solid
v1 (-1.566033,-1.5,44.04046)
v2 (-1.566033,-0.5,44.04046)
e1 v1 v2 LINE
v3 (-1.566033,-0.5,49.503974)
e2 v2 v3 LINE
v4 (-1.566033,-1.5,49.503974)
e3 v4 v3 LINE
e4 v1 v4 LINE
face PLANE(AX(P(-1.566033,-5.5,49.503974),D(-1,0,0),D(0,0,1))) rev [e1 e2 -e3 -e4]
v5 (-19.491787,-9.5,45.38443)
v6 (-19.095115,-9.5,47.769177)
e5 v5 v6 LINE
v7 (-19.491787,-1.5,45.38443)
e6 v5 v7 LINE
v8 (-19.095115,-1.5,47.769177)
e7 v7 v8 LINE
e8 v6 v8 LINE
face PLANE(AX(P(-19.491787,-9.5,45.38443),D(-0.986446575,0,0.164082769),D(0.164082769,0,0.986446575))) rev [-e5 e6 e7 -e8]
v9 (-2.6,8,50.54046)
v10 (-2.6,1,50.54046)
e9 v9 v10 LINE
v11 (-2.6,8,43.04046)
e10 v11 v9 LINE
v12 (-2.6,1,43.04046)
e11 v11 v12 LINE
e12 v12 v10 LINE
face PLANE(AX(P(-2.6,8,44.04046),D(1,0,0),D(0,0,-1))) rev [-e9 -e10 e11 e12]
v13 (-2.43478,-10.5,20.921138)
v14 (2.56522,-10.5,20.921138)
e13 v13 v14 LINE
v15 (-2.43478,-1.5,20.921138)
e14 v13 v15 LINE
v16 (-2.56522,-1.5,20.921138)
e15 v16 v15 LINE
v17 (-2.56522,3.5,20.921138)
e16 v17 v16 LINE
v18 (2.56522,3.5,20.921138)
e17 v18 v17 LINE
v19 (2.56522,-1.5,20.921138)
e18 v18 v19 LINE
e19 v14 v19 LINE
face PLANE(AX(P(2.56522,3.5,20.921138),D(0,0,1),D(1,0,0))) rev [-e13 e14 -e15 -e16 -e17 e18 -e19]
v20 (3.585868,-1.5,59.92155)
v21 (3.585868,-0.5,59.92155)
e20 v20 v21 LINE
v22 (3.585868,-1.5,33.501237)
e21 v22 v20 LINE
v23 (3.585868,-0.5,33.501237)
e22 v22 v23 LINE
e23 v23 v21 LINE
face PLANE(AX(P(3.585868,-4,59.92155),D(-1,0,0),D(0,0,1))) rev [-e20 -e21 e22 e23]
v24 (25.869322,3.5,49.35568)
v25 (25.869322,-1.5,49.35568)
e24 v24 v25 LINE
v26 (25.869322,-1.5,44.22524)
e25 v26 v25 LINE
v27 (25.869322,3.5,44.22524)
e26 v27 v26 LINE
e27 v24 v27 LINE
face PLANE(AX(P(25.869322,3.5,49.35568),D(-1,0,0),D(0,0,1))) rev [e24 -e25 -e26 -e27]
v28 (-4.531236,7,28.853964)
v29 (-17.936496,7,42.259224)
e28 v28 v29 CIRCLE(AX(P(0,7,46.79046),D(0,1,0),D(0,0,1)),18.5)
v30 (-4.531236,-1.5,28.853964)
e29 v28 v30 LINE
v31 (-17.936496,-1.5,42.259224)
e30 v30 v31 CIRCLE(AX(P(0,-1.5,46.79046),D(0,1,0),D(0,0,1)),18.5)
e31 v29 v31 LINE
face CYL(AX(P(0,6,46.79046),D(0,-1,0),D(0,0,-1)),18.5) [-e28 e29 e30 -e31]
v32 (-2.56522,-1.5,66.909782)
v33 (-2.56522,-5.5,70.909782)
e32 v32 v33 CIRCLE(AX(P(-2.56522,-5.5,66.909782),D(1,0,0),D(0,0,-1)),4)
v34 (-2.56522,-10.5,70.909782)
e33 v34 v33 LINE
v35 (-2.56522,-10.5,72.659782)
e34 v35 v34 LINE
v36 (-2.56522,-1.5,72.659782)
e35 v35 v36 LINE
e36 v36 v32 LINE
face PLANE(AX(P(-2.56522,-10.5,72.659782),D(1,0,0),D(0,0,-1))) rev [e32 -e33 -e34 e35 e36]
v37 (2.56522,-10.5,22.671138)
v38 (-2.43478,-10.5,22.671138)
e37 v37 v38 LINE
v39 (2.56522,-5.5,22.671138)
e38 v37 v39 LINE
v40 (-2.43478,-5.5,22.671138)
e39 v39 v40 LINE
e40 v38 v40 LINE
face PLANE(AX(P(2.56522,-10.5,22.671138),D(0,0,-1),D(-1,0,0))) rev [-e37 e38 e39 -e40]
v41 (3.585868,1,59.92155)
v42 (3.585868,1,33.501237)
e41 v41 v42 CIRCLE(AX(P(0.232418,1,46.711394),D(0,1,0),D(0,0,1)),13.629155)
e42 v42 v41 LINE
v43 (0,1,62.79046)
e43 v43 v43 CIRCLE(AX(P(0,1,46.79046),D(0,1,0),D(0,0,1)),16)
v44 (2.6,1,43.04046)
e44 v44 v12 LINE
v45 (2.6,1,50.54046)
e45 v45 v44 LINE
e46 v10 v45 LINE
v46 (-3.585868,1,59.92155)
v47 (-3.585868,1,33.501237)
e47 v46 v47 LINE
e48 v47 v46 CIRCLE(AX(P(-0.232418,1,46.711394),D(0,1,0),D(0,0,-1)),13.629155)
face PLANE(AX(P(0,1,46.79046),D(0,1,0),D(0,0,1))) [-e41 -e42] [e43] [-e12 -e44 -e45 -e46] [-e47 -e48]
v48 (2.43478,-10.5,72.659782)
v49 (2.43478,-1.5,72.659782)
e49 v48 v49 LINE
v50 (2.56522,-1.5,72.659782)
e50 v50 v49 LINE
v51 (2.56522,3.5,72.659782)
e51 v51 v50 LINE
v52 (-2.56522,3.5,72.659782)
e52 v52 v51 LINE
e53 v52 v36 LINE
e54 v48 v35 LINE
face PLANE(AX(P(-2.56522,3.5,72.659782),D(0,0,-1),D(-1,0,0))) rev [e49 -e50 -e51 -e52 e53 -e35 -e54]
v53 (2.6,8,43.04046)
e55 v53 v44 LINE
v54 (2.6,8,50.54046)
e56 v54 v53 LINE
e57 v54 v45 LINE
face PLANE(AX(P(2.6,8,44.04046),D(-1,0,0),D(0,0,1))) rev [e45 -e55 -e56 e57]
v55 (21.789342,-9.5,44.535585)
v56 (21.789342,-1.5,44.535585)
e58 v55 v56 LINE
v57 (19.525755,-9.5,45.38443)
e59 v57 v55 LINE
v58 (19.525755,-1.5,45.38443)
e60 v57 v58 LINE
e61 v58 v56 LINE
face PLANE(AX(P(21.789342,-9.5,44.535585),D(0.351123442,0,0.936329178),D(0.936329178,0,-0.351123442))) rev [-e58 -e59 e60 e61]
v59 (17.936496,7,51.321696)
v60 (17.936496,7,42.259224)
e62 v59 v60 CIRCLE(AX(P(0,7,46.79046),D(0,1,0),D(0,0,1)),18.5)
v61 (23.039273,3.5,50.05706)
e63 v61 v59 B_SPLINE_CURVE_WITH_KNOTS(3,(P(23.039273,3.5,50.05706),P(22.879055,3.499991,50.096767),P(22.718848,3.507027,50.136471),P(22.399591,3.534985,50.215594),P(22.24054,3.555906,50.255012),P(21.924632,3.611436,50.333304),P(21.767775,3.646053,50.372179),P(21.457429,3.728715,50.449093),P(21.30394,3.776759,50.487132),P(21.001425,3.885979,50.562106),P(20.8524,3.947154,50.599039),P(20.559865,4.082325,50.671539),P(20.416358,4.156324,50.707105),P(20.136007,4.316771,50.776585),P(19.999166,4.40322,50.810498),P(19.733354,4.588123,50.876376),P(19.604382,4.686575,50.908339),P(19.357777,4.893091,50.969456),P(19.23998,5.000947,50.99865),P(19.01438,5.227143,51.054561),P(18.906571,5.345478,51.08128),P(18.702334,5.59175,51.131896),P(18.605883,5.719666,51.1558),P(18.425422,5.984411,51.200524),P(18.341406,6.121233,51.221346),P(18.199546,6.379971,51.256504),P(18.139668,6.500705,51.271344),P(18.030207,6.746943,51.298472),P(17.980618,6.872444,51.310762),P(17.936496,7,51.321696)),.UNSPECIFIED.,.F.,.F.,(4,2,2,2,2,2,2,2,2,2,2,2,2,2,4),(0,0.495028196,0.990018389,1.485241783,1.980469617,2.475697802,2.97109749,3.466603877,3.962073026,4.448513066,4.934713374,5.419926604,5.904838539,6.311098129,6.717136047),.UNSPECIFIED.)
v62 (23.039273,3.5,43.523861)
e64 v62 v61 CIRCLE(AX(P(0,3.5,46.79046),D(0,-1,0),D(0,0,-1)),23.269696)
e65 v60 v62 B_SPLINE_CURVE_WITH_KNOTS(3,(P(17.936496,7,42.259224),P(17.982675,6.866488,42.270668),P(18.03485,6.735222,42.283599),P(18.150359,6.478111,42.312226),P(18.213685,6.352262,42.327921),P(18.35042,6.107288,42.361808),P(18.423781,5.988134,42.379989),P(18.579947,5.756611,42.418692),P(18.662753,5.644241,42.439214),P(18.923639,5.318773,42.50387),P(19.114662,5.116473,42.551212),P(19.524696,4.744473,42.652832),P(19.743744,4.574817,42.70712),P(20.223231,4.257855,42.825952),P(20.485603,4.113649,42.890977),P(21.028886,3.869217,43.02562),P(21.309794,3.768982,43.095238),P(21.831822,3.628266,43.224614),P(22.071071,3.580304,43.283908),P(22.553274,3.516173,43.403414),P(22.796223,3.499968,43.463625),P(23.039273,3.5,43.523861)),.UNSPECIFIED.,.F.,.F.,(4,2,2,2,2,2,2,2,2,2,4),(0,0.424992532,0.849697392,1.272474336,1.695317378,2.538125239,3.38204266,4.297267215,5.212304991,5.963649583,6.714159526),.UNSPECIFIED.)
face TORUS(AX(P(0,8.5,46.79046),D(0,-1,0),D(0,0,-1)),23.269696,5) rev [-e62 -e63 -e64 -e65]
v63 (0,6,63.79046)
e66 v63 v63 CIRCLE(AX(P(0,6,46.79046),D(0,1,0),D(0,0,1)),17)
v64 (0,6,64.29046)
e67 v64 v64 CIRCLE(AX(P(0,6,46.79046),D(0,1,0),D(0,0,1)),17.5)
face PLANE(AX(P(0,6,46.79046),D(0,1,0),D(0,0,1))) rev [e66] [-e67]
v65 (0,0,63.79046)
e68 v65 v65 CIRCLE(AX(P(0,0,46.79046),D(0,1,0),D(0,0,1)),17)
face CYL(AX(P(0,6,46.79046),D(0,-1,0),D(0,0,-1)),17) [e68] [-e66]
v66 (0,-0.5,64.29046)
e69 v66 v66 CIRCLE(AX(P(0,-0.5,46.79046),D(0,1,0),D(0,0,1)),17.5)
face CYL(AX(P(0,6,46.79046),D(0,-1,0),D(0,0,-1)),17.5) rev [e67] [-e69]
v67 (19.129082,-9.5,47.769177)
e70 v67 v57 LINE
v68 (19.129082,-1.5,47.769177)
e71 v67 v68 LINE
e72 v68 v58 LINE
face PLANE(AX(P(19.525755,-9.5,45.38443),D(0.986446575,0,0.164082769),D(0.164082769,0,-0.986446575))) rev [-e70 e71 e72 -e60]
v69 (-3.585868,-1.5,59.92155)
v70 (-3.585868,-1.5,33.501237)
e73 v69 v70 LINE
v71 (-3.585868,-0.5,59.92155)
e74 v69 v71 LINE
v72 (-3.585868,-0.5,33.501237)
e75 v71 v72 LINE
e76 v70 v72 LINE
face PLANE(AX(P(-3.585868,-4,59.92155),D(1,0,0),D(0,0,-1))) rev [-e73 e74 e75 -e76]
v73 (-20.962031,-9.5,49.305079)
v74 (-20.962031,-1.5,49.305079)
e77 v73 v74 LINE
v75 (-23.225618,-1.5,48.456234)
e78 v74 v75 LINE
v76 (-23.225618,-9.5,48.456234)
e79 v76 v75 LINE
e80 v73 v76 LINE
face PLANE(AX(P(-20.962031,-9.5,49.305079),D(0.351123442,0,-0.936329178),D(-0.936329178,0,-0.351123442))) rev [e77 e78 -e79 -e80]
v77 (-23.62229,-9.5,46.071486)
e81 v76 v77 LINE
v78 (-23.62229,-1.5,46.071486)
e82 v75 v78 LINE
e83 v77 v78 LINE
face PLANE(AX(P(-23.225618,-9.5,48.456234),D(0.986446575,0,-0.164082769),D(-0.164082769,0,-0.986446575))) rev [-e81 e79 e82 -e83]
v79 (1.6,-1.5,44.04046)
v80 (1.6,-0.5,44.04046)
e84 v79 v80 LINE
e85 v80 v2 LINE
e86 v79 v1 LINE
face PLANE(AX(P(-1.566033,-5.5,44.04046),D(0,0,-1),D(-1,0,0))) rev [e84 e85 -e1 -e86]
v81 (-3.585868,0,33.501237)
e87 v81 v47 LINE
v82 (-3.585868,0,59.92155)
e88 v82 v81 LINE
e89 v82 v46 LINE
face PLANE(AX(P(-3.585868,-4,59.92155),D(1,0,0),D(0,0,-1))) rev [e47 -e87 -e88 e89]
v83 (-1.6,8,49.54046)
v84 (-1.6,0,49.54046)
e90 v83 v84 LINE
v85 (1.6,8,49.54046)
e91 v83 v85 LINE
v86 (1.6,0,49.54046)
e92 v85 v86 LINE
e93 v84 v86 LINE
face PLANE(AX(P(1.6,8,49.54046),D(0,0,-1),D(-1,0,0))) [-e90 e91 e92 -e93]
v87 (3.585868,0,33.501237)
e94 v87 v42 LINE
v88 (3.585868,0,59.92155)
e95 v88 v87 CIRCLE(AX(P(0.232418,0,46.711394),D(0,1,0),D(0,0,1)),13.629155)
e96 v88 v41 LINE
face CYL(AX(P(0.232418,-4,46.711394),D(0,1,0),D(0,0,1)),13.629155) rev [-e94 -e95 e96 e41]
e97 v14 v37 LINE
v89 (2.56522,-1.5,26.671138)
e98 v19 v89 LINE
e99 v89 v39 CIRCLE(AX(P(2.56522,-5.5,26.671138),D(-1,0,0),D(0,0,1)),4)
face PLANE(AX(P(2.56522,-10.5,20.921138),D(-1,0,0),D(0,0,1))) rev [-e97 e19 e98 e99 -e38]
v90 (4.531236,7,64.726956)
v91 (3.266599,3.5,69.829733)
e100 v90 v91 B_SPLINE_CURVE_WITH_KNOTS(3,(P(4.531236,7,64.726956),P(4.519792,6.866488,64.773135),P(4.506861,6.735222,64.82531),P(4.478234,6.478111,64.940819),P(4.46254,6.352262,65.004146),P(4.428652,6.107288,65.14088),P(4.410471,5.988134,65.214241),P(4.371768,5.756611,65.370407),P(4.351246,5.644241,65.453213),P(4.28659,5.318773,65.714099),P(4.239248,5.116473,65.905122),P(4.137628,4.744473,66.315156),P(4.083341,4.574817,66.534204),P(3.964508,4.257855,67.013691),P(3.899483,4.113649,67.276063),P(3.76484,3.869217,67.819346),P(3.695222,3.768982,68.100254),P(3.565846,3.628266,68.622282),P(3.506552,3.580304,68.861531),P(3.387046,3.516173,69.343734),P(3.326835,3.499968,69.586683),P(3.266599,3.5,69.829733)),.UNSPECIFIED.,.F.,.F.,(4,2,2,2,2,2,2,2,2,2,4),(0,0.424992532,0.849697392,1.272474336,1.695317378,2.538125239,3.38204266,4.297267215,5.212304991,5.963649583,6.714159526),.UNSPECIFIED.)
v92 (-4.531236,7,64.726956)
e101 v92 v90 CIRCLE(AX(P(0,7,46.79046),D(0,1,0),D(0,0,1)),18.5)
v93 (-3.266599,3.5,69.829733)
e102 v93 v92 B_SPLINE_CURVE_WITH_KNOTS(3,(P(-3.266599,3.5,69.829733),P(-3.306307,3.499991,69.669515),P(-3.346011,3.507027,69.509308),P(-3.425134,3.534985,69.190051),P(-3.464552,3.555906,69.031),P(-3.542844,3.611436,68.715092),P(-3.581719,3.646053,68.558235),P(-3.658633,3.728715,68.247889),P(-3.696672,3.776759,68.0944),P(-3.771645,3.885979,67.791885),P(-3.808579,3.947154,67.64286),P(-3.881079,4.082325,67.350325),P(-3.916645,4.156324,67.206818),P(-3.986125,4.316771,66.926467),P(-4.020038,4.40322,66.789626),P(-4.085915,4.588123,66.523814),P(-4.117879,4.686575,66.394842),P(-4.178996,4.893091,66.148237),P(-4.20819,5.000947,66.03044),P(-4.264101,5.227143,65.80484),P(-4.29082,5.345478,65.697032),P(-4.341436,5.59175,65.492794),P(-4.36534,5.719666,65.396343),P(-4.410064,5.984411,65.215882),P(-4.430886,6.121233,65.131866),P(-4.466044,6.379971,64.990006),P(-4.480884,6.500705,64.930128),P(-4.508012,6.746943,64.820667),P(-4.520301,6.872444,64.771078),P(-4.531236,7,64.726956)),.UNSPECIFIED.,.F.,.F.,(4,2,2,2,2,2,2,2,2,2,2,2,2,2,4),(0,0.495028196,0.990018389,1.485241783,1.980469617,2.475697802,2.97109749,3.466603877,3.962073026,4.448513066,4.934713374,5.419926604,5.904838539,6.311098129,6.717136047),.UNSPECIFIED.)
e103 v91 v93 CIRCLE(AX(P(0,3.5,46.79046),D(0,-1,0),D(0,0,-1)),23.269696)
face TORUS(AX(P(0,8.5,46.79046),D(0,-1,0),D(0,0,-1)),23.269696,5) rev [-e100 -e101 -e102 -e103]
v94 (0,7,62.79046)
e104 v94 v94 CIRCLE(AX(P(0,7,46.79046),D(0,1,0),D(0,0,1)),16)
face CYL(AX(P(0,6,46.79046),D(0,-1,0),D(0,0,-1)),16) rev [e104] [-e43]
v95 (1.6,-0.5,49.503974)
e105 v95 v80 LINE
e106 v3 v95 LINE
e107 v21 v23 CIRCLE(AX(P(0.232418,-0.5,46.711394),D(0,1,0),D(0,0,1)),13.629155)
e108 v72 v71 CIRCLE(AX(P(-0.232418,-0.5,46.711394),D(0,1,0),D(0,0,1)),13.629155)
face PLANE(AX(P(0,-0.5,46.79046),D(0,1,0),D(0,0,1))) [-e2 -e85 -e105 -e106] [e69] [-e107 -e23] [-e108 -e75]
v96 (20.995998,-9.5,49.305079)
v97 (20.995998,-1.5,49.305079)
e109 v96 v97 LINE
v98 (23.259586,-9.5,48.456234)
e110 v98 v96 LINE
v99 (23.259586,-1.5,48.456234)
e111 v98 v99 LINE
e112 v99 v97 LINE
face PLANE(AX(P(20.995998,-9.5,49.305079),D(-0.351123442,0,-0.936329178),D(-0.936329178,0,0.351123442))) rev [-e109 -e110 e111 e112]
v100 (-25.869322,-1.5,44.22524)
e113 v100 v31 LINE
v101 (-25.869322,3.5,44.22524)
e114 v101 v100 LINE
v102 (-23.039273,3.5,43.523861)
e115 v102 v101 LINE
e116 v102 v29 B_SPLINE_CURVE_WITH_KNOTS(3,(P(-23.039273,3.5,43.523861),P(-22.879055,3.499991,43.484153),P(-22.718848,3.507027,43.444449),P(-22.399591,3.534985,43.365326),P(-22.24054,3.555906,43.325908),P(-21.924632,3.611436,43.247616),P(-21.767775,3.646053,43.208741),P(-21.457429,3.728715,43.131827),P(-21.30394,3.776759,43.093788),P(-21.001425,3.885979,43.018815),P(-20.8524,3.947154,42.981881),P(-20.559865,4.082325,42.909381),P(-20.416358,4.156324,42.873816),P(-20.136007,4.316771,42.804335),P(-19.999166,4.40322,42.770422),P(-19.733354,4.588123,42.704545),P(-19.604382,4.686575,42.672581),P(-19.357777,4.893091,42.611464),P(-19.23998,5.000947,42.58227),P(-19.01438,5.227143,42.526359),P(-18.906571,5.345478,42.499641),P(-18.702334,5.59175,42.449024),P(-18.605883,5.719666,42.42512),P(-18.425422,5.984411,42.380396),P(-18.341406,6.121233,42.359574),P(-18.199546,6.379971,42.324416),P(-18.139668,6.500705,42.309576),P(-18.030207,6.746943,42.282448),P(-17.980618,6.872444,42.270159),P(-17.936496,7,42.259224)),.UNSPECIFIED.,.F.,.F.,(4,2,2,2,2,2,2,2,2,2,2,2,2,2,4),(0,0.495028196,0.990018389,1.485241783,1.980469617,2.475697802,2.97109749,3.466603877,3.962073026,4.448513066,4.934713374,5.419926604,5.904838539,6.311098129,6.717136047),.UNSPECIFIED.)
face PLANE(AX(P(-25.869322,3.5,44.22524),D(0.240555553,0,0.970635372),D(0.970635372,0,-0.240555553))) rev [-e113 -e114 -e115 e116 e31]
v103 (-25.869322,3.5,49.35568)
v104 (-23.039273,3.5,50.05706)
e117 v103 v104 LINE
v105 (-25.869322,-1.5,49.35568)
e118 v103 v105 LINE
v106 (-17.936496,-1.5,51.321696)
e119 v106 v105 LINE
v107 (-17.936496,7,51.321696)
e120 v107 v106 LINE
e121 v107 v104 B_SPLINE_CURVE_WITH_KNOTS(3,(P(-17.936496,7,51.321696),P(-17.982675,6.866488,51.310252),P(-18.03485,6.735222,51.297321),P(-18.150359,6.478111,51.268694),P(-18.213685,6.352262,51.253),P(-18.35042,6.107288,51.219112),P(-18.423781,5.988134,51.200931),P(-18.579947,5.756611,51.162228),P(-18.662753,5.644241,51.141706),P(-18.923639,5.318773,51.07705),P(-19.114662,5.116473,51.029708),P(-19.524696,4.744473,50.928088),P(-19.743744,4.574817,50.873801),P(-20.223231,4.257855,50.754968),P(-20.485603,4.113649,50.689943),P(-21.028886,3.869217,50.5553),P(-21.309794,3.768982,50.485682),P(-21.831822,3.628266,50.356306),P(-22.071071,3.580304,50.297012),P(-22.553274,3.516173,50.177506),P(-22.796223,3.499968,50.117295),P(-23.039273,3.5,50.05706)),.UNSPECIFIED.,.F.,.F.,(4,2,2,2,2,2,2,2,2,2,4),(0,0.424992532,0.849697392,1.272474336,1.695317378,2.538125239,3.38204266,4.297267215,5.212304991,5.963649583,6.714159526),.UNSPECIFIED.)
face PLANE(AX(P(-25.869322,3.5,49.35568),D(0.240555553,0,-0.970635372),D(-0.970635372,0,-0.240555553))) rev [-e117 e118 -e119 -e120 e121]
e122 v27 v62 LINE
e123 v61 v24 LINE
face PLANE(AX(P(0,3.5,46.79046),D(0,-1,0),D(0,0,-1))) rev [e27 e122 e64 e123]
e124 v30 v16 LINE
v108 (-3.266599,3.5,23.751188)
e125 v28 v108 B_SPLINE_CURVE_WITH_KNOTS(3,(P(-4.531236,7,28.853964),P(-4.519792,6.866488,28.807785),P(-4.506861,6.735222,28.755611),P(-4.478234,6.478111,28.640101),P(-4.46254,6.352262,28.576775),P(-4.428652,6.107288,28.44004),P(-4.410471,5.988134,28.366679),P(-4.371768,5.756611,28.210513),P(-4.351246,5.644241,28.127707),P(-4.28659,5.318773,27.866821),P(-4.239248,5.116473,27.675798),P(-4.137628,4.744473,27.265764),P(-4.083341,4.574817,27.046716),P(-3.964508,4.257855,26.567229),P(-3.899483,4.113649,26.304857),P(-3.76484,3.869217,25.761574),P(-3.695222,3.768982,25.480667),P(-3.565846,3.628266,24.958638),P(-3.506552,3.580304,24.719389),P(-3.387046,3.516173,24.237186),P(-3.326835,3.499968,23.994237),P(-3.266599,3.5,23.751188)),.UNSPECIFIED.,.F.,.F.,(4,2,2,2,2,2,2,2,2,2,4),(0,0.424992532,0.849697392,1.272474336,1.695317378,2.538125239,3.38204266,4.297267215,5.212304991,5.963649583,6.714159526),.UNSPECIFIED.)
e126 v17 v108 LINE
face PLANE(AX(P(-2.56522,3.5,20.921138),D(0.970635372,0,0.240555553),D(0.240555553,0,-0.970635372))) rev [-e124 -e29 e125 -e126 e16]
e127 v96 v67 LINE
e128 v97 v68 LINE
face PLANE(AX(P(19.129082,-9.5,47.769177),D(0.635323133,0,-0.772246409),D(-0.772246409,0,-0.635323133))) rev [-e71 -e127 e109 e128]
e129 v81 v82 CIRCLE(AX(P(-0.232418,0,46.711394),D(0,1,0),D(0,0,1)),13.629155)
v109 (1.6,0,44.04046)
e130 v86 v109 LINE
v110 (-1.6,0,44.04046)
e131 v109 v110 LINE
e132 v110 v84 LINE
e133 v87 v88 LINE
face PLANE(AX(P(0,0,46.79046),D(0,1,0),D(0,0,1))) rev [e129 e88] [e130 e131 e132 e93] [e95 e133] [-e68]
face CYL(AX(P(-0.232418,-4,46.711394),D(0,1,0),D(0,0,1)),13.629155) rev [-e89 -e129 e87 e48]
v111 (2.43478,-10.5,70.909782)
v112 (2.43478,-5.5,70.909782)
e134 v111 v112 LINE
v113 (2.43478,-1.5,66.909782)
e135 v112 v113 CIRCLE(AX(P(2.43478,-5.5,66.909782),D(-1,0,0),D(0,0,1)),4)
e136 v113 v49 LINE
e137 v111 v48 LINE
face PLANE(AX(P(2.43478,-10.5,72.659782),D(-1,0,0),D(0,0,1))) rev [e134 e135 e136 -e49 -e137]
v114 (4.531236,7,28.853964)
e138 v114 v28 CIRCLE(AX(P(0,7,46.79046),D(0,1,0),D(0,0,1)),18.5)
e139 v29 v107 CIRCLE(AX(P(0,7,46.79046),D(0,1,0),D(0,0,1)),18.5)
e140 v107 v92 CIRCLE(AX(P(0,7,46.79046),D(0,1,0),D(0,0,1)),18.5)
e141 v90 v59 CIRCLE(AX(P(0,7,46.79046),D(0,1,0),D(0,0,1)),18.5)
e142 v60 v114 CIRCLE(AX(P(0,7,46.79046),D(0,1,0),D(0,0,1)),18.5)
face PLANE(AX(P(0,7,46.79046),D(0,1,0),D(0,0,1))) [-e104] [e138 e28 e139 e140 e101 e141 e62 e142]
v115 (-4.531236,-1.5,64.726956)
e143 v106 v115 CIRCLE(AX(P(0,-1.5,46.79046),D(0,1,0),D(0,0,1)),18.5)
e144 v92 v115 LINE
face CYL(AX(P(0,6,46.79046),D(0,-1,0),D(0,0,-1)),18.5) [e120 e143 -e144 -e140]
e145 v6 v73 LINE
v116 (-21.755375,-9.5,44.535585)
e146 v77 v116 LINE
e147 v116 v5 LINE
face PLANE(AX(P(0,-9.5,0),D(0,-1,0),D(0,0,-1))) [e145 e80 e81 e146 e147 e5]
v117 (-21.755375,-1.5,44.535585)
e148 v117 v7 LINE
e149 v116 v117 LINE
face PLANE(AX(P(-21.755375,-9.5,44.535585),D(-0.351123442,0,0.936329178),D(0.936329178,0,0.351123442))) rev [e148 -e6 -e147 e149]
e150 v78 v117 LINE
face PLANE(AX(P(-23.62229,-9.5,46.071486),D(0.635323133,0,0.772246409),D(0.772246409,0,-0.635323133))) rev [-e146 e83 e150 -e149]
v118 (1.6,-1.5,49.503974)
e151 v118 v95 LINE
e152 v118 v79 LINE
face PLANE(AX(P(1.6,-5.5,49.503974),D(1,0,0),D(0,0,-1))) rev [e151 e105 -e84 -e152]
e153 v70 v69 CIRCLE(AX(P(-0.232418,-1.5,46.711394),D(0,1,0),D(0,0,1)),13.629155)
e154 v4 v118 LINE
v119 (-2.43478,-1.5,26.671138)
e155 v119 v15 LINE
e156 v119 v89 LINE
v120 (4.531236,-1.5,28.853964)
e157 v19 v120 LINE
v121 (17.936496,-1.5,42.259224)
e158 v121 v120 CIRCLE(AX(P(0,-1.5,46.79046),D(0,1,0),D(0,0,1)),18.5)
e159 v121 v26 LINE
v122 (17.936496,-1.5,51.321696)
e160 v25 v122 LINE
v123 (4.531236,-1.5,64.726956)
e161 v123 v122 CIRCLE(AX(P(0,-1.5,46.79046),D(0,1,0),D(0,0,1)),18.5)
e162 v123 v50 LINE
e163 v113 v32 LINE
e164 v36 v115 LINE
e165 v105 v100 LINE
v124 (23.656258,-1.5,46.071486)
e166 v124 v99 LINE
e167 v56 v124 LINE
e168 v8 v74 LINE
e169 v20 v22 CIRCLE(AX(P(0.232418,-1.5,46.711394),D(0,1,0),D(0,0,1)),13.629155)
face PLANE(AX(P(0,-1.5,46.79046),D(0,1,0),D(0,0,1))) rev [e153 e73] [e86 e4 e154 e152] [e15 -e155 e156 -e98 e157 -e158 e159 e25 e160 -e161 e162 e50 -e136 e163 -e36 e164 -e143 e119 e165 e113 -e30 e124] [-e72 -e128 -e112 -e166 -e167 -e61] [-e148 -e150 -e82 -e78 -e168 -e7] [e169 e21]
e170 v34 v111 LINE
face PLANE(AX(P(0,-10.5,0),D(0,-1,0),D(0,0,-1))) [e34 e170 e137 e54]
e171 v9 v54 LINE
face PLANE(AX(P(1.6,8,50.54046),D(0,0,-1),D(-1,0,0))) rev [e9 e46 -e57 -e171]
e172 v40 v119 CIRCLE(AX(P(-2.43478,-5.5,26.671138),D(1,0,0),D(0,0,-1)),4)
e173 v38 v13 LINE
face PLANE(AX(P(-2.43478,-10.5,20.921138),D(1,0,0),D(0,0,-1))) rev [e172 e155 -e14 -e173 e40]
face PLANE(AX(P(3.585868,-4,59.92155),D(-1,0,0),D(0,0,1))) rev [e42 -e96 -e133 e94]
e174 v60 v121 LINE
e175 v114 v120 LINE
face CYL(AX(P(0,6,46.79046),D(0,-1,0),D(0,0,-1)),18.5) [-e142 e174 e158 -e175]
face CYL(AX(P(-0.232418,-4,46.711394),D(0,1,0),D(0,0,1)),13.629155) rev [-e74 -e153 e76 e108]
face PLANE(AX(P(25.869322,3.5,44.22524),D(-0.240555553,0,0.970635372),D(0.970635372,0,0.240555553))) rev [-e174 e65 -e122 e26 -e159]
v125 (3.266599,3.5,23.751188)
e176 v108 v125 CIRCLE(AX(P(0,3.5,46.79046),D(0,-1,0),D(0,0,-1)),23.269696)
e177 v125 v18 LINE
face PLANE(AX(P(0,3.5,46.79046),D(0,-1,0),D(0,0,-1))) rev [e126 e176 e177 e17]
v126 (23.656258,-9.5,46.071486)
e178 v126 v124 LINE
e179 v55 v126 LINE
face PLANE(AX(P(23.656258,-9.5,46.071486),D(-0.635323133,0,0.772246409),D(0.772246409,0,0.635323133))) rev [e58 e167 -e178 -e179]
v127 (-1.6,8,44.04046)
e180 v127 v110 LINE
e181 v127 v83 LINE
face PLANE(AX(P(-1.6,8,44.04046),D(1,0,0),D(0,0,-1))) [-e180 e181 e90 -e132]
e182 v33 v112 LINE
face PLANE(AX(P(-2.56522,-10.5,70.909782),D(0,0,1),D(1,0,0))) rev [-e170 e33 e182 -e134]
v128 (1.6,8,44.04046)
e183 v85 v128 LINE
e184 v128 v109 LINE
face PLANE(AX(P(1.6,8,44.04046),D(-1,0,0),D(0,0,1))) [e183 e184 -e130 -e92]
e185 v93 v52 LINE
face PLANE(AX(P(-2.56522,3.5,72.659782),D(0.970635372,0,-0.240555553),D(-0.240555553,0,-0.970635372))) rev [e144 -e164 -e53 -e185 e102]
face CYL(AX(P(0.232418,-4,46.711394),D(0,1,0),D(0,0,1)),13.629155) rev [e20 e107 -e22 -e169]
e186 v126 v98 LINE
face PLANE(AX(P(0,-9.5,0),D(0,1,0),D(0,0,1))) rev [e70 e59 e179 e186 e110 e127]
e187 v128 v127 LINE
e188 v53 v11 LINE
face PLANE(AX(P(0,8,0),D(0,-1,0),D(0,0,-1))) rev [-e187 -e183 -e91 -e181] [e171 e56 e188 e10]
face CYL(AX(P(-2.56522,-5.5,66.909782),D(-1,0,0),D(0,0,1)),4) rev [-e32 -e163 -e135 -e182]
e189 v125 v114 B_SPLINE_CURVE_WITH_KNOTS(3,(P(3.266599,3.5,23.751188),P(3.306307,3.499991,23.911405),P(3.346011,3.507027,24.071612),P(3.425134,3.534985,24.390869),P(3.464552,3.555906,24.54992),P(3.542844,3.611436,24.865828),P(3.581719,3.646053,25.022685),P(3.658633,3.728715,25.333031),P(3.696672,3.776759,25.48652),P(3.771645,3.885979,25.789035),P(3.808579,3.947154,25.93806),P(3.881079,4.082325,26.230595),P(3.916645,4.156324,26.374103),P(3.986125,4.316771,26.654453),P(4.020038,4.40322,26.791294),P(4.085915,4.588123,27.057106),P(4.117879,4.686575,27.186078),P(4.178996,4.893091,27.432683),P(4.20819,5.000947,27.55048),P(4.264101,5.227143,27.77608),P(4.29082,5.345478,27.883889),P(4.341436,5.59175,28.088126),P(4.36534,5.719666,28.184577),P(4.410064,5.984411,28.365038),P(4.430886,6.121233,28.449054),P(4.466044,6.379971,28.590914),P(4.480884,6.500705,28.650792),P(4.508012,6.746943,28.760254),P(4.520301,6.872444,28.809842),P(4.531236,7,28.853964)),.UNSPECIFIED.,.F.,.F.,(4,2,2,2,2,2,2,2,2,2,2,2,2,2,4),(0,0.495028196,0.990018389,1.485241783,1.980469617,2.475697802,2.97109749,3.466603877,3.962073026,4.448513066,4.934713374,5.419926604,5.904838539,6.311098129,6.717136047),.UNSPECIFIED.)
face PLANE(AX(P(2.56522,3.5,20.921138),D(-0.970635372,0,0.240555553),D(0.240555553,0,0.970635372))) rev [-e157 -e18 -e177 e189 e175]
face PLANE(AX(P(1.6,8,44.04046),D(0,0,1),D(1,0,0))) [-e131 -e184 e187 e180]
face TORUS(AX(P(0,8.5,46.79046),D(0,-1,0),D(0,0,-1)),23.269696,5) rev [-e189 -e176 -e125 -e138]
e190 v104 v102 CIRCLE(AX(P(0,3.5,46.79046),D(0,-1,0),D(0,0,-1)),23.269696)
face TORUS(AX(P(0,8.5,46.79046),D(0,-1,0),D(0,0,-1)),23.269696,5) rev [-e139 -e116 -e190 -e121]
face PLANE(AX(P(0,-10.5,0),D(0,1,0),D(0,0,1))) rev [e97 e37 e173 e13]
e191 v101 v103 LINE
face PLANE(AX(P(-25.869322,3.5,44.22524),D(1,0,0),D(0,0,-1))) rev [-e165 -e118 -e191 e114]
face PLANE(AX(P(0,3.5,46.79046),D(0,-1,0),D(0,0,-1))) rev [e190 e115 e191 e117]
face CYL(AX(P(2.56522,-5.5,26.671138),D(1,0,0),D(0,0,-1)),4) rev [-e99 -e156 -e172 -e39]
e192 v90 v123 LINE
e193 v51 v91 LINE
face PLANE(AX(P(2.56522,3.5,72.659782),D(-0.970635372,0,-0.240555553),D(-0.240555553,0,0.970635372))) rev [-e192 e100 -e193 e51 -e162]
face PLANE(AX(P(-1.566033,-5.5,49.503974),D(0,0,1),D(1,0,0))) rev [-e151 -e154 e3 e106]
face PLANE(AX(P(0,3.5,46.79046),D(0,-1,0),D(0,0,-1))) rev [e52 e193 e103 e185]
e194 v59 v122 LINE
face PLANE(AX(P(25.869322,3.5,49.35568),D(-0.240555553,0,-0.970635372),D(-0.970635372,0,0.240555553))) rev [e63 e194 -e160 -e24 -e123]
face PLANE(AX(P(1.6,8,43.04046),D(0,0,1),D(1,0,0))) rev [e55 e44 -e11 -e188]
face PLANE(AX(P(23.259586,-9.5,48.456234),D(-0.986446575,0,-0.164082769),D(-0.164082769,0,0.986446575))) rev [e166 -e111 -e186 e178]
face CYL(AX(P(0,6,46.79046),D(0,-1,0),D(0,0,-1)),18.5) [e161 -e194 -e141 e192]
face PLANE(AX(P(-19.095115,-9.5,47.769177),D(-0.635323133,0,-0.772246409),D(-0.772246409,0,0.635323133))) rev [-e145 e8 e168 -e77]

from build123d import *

# Parameters (mm, degrees)
SKETCH4_R                = 17
BOSS_EXTRUDE3_DEPTH      = 6
SHELL4_T                 = 0.5
SKETCH5_W                = 3.2
SKETCH5_H                = 5.5
BOSS_EXTRUDE4_DEPTH      = 8
SHELL5_T                 = 1
BOSS_EXTRUDE6_DEPTH      = 3.5
BOSS_EXTRUDE6_DEPTH_BACK = 1.5
SKETCH7_W                = 5
SKETCH7_H                = 1.75
BOSS_EXTRUDE7_DEPTH      = 9
FILLET3_R                = 5
CUT_EXTRUDE1_DEPTH       = 5
SKETCH13_W               = 3.166032567
SKETCH13_H               = 5.463514234
CUT_EXTRUDE2_DEPTH       = 5
FILLET4_R                = 4
BOSS_EXTRUDE8_DEPTH      = 8


with BuildPart() as part:
    # Sketch4 → Boss-Extrude3 (new body)
    with BuildSketch(Plane(origin=(0, 0, 0), x_dir=(1, 0, 0), z_dir=(0, 1, 0))):
        with Locations(Location((0, -46.79046007, 0), (0, 0, 270))):
            Circle(SKETCH4_R)
    extrude(amount=BOSS_EXTRUDE3_DEPTH)

    # Shell4
    shell4_openings = [part.faces().sort_by_distance(p)[0] for p in [
        (0, 6, 46.79046007),
    ]]
    offset(amount=SHELL4_T, openings=shell4_openings, kind=Kind.INTERSECTION)

    # Sketch5 → Boss-Extrude4 (add)
    with BuildSketch(Plane(origin=(0, 0, 0), x_dir=(1, 0, 0), z_dir=(0, 1, 0))):
        with Locations((0, -46.79046007)):
            Rectangle(SKETCH5_W, SKETCH5_H)
    extrude(amount=BOSS_EXTRUDE4_DEPTH)

    # Shell5
    shell5_openings = [part.faces().sort_by_distance(p)[0] for p in [
        (0, 8, 46.79046007),
    ]]
    offset(amount=SHELL5_T, openings=shell5_openings, kind=Kind.INTERSECTION)

    # Sketch6 → Boss-Extrude6 (add, two sides: drawn at the far end of the back side and taken through both)
    with BuildSketch(Plane(origin=(0, 0, 0), x_dir=(1, 0, 0), z_dir=(0, 1, 0)).offset(-BOSS_EXTRUDE6_DEPTH_BACK)):
        with BuildLine():
            Line((-2.565219646, -72.659781842), (2.565219646, -72.659781842))
            Line((2.565219646, -72.659781842), (4.531236217, -64.726956337))
            ThreePointArc((4.531236217, -64.726956337), (0, -65.29046007), (-4.531236217, -64.726956337))
            Line((-4.531236217, -64.726956337), (-2.565219646, -72.659781842))
        make_face()
        with BuildLine():
            Line((-25.869321772, -44.225240424), (-17.936496267, -42.259223853))
            ThreePointArc((-17.936496267, -42.259223853), (-18.5, -46.79046007), (-17.936496267, -51.321696288))
            Line((-17.936496267, -51.321696288), (-25.869321772, -49.355679717))
            Line((-25.869321772, -49.355679717), (-25.869321772, -44.225240424))
        make_face()
        with BuildLine():
            Line((2.565219646, -20.921138298), (4.531236217, -28.853963803))
            ThreePointArc((4.531236217, -28.853963803), (0, -28.29046007), (-4.531236217, -28.853963803))
            Line((-4.531236217, -28.853963803), (-2.565219646, -20.921138298))
            Line((-2.565219646, -20.921138298), (2.565219646, -20.921138298))
        make_face()
        with BuildLine():
            Line((25.869321772, -49.355679717), (17.936496267, -51.321696288))
            ThreePointArc((17.936496267, -51.321696288), (18.5, -46.79046007), (17.936496267, -42.259223853))
            Line((17.936496267, -42.259223853), (25.869321772, -44.225240424))
            Line((25.869321772, -44.225240424), (25.869321772, -49.355679717))
        make_face()
    extrude(amount=BOSS_EXTRUDE6_DEPTH + BOSS_EXTRUDE6_DEPTH_BACK)

    # Sketch7 → Boss-Extrude7 (add)
    with BuildSketch(Plane(origin=(0, -1.5, 0), x_dir=(-1, 0, 0), z_dir=(0, -1, 0))):
        with Locations((0.065219646, -71.784781842)):
            Rectangle(SKETCH7_W, SKETCH7_H)
        with Locations((-0.065219646, -21.796138298)):
            Rectangle(SKETCH7_W, SKETCH7_H)
    extrude(amount=BOSS_EXTRUDE7_DEPTH)

    # Fillet3
    # the kernel refuses this fillet: 5 mm, written as the material it adds along each edge
    with BuildSketch(Plane(origin=(0, 3.5, 46.79046007), x_dir=(-0.6278344871312538, 0, -0.7783468743231616), z_dir=(0.7783468743231616, 0, -0.6278344871312538))) as fillet3_piece_1_section:
        with BuildLine():
            CenterArc((23.269696007, 5), FILLET3_R, 197.457603124, 72.542396876)
            Line((23.269696007, 0), (23.269696007, -0.1))
            Line((23.269696007, -0.1), (18.5, -0.1))
            Line((18.5, -0.1), (18.4, 0))
            ThreePointArc((18.4, 0), (18.4, 1.75), (18.40460608, 3.47))
            Line((18.40460608, 3.47), (18.5, 3.5))
        make_face()
    fillet3_piece_1 = revolve(axis=Axis((0, 3.5, 46.79046007), (0, 1, 0)), revolution_arc=102.218929963, mode=Mode.PRIVATE)
    fillet3_piece_1 = split(fillet3_piece_1, bisect_by=Plane(origin=(-20.380505818, 4.426759582, 42.864930265), z_dir=(0.24055555302697984, 0, 0.9706353722731745)), keep=Keep.TOP, mode=Mode.PRIVATE)
    fillet3_piece_1 = split(fillet3_piece_1, bisect_by=Plane(origin=(-20.380505744, 4.426759582, 50.715989893), z_dir=(0.24055555302697348, 0, -0.9706353722731761)), keep=Keep.TOP, mode=Mode.PRIVATE)
    add(fillet3_piece_1)
    with BuildSketch(Plane(origin=(0, 3.5, 46.79046007), x_dir=(0.7783347748418207, 0, 0.6278494869568123), z_dir=(0.6278494869568123, 0, -0.7783347748418207))) as fillet3_piece_2_section:
        with BuildLine():
            CenterArc((23.269696007, -5), FILLET3_R, 90, 72.542396876)
            Line((23.269696007, 0), (23.269696007, 0.1))
            Line((23.269696007, 0.1), (18.5, 0.1))
            Line((18.5, 0.1), (18.4, 0))
            ThreePointArc((18.4, 0), (18.4, -1.75), (18.40460608, -3.47))
            Line((18.40460608, -3.47), (18.5, -3.5))
        make_face()
    fillet3_piece_2 = revolve(axis=Axis((0, 3.5, 46.79046007), (0, -1, 0)), revolution_arc=51.108360804, mode=Mode.PRIVATE)
    fillet3_piece_2 = split(fillet3_piece_2, bisect_by=Plane(origin=(4.048850537, 4.426759722, 66.673369956), z_dir=(-0.970635372273176, 0, -0.24055555302697343)), keep=Keep.TOP, mode=Mode.PRIVATE)
    add(fillet3_piece_2)
    with BuildSketch(Plane(origin=(0, 3.5, 46.79046007), x_dir=(0.7783468743230912, 0, -0.6278344871313409), z_dir=(0.6278344871313409, 0, 0.7783468743230912))) as fillet3_piece_3_section:
        with BuildLine():
            CenterArc((23.269696007, 5), FILLET3_R, 197.457603124, 72.542396876)
            Line((23.269696007, 0), (23.269696007, -0.1))
            Line((23.269696007, -0.1), (18.5, -0.1))
            Line((18.5, -0.1), (18.4, 0))
            ThreePointArc((18.4, 0), (18.4, 1.75), (18.40460608, 3.47))
            Line((18.40460608, 3.47), (18.5, 3.5))
        make_face()
    fillet3_piece_3 = revolve(axis=Axis((0, 3.5, 46.79046007), (0, 1, 0)), revolution_arc=102.218929963, mode=Mode.PRIVATE)
    fillet3_piece_3 = split(fillet3_piece_3, bisect_by=Plane(origin=(3.925529805, 4.426759582, 26.409954252), z_dir=(-0.9706353722731743, 0, 0.24055555302698087)), keep=Keep.TOP, mode=Mode.PRIVATE)
    fillet3_piece_3 = split(fillet3_piece_3, bisect_by=Plane(origin=(-3.925529823, 4.426759582, 26.409954326), z_dir=(0.9706353722731764, 0, 0.2405555530269717)), keep=Keep.TOP, mode=Mode.PRIVATE)
    add(fillet3_piece_3)
    with BuildSketch(Plane(origin=(0, 3.5, 46.79046007), x_dir=(0.6278344871312218, 0, 0.7783468743231875), z_dir=(-0.7783468743231875, 0, 0.6278344871312218))) as fillet3_piece_4_section:
        with BuildLine():
            CenterArc((23.269696007, 5), FILLET3_R, 197.457603124, 72.542396876)
            Line((23.269696007, 0), (23.269696007, -0.1))
            Line((23.269696007, -0.1), (18.5, -0.1))
            Line((18.5, -0.1), (18.4, 0))
            ThreePointArc((18.4, 0), (18.4, 1.75), (18.40460608, 3.47))
            Line((18.40460608, 3.47), (18.5, 3.5))
        make_face()
    fillet3_piece_4 = revolve(axis=Axis((0, 3.5, 46.79046007), (0, 1, 0)), revolution_arc=102.218929963, mode=Mode.PRIVATE)
    fillet3_piece_4 = split(fillet3_piece_4, bisect_by=Plane(origin=(20.380505818, 4.426759582, 50.715989875), z_dir=(-0.24055555302698112, 0, -0.9706353722731741)), keep=Keep.TOP, mode=Mode.PRIVATE)
    fillet3_piece_4 = split(fillet3_piece_4, bisect_by=Plane(origin=(20.380505744, 4.426759582, 42.864930247), z_dir=(-0.24055555302697304, 0, 0.9706353722731761)), keep=Keep.TOP, mode=Mode.PRIVATE)
    add(fillet3_piece_4)
    with BuildSketch(Plane(origin=(0, 3.5, 46.79046007), x_dir=(0, 0, 1), z_dir=(1, 0, 0))) as fillet3_piece_5_section:
        with BuildLine():
            CenterArc((23.269696007, -5), FILLET3_R, 90, 72.542396876)
            Line((23.269696007, 0), (23.269696007, 0.1))
            Line((23.269696007, 0.1), (18.5, 0.1))
            Line((18.5, 0.1), (18.4, 0))
            ThreePointArc((18.4, 0), (18.4, -1.75), (18.40460608, -3.47))
            Line((18.40460608, -3.47), (18.5, -3.5))
        make_face()
    fillet3_piece_5 = revolve(axis=Axis((0, 3.5, 46.79046007), (0, -1, 0)), revolution_arc=51.108360804, mode=Mode.PRIVATE)
    fillet3_piece_5 = split(fillet3_piece_5, bisect_by=Plane(origin=(-4.04885046, 4.426759578, 66.673370268), z_dir=(0.9706353722731745, 0, -0.24055555302697917)), keep=Keep.TOP, mode=Mode.PRIVATE)
    add(fillet3_piece_5)

    # Sketch11 → Cut-Extrude1 (cut)
    with BuildSketch(Plane(origin=(0, 1, 0), x_dir=(1, 0, 0), z_dir=(0, 1, 0))):
        with BuildLine():
            Line((-3.585868376, -59.921550203), (-3.585868376, -33.501237191))
            ThreePointArc((-3.585868376, -33.501237191), (-13.861572731, -46.711393697), (-3.585868376, -59.921550203))
        make_face()
        with BuildLine():
            Line((3.585868376, -59.921550203), (3.585868376, -33.501237191))
            ThreePointArc((3.585868376, -33.501237191), (13.861572731, -46.711393697), (3.585868376, -59.921550203))
        make_face()
    extrude(amount=-CUT_EXTRUDE1_DEPTH, mode=Mode.SUBTRACT)

    # Sketch13 → Cut-Extrude2 (cut)
    with BuildSketch(Plane(origin=(0, -0.5, 0), x_dir=(1, 0, 0), z_dir=(0, 1, 0))):
        with Locations((0.016983716, -46.772217187)):
            Rectangle(SKETCH13_W, SKETCH13_H)
    extrude(amount=-CUT_EXTRUDE2_DEPTH, mode=Mode.SUBTRACT)

    # Fillet4
    fillet4_edges = [part.edges().sort_by_distance(p)[0] for p in [
        (0.065219646, -1.5, 22.671138298),
        (-0.065219646, -1.5, 70.909781842),
    ]]
    fillet(fillet4_edges, radius=FILLET4_R)

    # Sketch16 → Boss-Extrude8 (add)
    with BuildSketch(Plane(origin=(0, -1.5, 0), x_dir=(-1, 0, 0), z_dir=(0, -1, 0))):
        Polygon((19.095115037, -47.769177252), (20.96203058, -49.305079029), (23.225618307, -48.456233631), (23.622290493, -46.071486456), (21.75537495, -44.535584679), (19.491787223, -45.384430077), align=None)
        Polygon((-19.525754656, -45.384430077), (-19.12908247, -47.769177252), (-20.995998013, -49.305079029), (-23.25958574, -48.456233631), (-23.656257926, -46.071486456), (-21.789342383, -44.535584679), align=None)
    extrude(amount=BOSS_EXTRUDE8_DEPTH)


solid = part.part
